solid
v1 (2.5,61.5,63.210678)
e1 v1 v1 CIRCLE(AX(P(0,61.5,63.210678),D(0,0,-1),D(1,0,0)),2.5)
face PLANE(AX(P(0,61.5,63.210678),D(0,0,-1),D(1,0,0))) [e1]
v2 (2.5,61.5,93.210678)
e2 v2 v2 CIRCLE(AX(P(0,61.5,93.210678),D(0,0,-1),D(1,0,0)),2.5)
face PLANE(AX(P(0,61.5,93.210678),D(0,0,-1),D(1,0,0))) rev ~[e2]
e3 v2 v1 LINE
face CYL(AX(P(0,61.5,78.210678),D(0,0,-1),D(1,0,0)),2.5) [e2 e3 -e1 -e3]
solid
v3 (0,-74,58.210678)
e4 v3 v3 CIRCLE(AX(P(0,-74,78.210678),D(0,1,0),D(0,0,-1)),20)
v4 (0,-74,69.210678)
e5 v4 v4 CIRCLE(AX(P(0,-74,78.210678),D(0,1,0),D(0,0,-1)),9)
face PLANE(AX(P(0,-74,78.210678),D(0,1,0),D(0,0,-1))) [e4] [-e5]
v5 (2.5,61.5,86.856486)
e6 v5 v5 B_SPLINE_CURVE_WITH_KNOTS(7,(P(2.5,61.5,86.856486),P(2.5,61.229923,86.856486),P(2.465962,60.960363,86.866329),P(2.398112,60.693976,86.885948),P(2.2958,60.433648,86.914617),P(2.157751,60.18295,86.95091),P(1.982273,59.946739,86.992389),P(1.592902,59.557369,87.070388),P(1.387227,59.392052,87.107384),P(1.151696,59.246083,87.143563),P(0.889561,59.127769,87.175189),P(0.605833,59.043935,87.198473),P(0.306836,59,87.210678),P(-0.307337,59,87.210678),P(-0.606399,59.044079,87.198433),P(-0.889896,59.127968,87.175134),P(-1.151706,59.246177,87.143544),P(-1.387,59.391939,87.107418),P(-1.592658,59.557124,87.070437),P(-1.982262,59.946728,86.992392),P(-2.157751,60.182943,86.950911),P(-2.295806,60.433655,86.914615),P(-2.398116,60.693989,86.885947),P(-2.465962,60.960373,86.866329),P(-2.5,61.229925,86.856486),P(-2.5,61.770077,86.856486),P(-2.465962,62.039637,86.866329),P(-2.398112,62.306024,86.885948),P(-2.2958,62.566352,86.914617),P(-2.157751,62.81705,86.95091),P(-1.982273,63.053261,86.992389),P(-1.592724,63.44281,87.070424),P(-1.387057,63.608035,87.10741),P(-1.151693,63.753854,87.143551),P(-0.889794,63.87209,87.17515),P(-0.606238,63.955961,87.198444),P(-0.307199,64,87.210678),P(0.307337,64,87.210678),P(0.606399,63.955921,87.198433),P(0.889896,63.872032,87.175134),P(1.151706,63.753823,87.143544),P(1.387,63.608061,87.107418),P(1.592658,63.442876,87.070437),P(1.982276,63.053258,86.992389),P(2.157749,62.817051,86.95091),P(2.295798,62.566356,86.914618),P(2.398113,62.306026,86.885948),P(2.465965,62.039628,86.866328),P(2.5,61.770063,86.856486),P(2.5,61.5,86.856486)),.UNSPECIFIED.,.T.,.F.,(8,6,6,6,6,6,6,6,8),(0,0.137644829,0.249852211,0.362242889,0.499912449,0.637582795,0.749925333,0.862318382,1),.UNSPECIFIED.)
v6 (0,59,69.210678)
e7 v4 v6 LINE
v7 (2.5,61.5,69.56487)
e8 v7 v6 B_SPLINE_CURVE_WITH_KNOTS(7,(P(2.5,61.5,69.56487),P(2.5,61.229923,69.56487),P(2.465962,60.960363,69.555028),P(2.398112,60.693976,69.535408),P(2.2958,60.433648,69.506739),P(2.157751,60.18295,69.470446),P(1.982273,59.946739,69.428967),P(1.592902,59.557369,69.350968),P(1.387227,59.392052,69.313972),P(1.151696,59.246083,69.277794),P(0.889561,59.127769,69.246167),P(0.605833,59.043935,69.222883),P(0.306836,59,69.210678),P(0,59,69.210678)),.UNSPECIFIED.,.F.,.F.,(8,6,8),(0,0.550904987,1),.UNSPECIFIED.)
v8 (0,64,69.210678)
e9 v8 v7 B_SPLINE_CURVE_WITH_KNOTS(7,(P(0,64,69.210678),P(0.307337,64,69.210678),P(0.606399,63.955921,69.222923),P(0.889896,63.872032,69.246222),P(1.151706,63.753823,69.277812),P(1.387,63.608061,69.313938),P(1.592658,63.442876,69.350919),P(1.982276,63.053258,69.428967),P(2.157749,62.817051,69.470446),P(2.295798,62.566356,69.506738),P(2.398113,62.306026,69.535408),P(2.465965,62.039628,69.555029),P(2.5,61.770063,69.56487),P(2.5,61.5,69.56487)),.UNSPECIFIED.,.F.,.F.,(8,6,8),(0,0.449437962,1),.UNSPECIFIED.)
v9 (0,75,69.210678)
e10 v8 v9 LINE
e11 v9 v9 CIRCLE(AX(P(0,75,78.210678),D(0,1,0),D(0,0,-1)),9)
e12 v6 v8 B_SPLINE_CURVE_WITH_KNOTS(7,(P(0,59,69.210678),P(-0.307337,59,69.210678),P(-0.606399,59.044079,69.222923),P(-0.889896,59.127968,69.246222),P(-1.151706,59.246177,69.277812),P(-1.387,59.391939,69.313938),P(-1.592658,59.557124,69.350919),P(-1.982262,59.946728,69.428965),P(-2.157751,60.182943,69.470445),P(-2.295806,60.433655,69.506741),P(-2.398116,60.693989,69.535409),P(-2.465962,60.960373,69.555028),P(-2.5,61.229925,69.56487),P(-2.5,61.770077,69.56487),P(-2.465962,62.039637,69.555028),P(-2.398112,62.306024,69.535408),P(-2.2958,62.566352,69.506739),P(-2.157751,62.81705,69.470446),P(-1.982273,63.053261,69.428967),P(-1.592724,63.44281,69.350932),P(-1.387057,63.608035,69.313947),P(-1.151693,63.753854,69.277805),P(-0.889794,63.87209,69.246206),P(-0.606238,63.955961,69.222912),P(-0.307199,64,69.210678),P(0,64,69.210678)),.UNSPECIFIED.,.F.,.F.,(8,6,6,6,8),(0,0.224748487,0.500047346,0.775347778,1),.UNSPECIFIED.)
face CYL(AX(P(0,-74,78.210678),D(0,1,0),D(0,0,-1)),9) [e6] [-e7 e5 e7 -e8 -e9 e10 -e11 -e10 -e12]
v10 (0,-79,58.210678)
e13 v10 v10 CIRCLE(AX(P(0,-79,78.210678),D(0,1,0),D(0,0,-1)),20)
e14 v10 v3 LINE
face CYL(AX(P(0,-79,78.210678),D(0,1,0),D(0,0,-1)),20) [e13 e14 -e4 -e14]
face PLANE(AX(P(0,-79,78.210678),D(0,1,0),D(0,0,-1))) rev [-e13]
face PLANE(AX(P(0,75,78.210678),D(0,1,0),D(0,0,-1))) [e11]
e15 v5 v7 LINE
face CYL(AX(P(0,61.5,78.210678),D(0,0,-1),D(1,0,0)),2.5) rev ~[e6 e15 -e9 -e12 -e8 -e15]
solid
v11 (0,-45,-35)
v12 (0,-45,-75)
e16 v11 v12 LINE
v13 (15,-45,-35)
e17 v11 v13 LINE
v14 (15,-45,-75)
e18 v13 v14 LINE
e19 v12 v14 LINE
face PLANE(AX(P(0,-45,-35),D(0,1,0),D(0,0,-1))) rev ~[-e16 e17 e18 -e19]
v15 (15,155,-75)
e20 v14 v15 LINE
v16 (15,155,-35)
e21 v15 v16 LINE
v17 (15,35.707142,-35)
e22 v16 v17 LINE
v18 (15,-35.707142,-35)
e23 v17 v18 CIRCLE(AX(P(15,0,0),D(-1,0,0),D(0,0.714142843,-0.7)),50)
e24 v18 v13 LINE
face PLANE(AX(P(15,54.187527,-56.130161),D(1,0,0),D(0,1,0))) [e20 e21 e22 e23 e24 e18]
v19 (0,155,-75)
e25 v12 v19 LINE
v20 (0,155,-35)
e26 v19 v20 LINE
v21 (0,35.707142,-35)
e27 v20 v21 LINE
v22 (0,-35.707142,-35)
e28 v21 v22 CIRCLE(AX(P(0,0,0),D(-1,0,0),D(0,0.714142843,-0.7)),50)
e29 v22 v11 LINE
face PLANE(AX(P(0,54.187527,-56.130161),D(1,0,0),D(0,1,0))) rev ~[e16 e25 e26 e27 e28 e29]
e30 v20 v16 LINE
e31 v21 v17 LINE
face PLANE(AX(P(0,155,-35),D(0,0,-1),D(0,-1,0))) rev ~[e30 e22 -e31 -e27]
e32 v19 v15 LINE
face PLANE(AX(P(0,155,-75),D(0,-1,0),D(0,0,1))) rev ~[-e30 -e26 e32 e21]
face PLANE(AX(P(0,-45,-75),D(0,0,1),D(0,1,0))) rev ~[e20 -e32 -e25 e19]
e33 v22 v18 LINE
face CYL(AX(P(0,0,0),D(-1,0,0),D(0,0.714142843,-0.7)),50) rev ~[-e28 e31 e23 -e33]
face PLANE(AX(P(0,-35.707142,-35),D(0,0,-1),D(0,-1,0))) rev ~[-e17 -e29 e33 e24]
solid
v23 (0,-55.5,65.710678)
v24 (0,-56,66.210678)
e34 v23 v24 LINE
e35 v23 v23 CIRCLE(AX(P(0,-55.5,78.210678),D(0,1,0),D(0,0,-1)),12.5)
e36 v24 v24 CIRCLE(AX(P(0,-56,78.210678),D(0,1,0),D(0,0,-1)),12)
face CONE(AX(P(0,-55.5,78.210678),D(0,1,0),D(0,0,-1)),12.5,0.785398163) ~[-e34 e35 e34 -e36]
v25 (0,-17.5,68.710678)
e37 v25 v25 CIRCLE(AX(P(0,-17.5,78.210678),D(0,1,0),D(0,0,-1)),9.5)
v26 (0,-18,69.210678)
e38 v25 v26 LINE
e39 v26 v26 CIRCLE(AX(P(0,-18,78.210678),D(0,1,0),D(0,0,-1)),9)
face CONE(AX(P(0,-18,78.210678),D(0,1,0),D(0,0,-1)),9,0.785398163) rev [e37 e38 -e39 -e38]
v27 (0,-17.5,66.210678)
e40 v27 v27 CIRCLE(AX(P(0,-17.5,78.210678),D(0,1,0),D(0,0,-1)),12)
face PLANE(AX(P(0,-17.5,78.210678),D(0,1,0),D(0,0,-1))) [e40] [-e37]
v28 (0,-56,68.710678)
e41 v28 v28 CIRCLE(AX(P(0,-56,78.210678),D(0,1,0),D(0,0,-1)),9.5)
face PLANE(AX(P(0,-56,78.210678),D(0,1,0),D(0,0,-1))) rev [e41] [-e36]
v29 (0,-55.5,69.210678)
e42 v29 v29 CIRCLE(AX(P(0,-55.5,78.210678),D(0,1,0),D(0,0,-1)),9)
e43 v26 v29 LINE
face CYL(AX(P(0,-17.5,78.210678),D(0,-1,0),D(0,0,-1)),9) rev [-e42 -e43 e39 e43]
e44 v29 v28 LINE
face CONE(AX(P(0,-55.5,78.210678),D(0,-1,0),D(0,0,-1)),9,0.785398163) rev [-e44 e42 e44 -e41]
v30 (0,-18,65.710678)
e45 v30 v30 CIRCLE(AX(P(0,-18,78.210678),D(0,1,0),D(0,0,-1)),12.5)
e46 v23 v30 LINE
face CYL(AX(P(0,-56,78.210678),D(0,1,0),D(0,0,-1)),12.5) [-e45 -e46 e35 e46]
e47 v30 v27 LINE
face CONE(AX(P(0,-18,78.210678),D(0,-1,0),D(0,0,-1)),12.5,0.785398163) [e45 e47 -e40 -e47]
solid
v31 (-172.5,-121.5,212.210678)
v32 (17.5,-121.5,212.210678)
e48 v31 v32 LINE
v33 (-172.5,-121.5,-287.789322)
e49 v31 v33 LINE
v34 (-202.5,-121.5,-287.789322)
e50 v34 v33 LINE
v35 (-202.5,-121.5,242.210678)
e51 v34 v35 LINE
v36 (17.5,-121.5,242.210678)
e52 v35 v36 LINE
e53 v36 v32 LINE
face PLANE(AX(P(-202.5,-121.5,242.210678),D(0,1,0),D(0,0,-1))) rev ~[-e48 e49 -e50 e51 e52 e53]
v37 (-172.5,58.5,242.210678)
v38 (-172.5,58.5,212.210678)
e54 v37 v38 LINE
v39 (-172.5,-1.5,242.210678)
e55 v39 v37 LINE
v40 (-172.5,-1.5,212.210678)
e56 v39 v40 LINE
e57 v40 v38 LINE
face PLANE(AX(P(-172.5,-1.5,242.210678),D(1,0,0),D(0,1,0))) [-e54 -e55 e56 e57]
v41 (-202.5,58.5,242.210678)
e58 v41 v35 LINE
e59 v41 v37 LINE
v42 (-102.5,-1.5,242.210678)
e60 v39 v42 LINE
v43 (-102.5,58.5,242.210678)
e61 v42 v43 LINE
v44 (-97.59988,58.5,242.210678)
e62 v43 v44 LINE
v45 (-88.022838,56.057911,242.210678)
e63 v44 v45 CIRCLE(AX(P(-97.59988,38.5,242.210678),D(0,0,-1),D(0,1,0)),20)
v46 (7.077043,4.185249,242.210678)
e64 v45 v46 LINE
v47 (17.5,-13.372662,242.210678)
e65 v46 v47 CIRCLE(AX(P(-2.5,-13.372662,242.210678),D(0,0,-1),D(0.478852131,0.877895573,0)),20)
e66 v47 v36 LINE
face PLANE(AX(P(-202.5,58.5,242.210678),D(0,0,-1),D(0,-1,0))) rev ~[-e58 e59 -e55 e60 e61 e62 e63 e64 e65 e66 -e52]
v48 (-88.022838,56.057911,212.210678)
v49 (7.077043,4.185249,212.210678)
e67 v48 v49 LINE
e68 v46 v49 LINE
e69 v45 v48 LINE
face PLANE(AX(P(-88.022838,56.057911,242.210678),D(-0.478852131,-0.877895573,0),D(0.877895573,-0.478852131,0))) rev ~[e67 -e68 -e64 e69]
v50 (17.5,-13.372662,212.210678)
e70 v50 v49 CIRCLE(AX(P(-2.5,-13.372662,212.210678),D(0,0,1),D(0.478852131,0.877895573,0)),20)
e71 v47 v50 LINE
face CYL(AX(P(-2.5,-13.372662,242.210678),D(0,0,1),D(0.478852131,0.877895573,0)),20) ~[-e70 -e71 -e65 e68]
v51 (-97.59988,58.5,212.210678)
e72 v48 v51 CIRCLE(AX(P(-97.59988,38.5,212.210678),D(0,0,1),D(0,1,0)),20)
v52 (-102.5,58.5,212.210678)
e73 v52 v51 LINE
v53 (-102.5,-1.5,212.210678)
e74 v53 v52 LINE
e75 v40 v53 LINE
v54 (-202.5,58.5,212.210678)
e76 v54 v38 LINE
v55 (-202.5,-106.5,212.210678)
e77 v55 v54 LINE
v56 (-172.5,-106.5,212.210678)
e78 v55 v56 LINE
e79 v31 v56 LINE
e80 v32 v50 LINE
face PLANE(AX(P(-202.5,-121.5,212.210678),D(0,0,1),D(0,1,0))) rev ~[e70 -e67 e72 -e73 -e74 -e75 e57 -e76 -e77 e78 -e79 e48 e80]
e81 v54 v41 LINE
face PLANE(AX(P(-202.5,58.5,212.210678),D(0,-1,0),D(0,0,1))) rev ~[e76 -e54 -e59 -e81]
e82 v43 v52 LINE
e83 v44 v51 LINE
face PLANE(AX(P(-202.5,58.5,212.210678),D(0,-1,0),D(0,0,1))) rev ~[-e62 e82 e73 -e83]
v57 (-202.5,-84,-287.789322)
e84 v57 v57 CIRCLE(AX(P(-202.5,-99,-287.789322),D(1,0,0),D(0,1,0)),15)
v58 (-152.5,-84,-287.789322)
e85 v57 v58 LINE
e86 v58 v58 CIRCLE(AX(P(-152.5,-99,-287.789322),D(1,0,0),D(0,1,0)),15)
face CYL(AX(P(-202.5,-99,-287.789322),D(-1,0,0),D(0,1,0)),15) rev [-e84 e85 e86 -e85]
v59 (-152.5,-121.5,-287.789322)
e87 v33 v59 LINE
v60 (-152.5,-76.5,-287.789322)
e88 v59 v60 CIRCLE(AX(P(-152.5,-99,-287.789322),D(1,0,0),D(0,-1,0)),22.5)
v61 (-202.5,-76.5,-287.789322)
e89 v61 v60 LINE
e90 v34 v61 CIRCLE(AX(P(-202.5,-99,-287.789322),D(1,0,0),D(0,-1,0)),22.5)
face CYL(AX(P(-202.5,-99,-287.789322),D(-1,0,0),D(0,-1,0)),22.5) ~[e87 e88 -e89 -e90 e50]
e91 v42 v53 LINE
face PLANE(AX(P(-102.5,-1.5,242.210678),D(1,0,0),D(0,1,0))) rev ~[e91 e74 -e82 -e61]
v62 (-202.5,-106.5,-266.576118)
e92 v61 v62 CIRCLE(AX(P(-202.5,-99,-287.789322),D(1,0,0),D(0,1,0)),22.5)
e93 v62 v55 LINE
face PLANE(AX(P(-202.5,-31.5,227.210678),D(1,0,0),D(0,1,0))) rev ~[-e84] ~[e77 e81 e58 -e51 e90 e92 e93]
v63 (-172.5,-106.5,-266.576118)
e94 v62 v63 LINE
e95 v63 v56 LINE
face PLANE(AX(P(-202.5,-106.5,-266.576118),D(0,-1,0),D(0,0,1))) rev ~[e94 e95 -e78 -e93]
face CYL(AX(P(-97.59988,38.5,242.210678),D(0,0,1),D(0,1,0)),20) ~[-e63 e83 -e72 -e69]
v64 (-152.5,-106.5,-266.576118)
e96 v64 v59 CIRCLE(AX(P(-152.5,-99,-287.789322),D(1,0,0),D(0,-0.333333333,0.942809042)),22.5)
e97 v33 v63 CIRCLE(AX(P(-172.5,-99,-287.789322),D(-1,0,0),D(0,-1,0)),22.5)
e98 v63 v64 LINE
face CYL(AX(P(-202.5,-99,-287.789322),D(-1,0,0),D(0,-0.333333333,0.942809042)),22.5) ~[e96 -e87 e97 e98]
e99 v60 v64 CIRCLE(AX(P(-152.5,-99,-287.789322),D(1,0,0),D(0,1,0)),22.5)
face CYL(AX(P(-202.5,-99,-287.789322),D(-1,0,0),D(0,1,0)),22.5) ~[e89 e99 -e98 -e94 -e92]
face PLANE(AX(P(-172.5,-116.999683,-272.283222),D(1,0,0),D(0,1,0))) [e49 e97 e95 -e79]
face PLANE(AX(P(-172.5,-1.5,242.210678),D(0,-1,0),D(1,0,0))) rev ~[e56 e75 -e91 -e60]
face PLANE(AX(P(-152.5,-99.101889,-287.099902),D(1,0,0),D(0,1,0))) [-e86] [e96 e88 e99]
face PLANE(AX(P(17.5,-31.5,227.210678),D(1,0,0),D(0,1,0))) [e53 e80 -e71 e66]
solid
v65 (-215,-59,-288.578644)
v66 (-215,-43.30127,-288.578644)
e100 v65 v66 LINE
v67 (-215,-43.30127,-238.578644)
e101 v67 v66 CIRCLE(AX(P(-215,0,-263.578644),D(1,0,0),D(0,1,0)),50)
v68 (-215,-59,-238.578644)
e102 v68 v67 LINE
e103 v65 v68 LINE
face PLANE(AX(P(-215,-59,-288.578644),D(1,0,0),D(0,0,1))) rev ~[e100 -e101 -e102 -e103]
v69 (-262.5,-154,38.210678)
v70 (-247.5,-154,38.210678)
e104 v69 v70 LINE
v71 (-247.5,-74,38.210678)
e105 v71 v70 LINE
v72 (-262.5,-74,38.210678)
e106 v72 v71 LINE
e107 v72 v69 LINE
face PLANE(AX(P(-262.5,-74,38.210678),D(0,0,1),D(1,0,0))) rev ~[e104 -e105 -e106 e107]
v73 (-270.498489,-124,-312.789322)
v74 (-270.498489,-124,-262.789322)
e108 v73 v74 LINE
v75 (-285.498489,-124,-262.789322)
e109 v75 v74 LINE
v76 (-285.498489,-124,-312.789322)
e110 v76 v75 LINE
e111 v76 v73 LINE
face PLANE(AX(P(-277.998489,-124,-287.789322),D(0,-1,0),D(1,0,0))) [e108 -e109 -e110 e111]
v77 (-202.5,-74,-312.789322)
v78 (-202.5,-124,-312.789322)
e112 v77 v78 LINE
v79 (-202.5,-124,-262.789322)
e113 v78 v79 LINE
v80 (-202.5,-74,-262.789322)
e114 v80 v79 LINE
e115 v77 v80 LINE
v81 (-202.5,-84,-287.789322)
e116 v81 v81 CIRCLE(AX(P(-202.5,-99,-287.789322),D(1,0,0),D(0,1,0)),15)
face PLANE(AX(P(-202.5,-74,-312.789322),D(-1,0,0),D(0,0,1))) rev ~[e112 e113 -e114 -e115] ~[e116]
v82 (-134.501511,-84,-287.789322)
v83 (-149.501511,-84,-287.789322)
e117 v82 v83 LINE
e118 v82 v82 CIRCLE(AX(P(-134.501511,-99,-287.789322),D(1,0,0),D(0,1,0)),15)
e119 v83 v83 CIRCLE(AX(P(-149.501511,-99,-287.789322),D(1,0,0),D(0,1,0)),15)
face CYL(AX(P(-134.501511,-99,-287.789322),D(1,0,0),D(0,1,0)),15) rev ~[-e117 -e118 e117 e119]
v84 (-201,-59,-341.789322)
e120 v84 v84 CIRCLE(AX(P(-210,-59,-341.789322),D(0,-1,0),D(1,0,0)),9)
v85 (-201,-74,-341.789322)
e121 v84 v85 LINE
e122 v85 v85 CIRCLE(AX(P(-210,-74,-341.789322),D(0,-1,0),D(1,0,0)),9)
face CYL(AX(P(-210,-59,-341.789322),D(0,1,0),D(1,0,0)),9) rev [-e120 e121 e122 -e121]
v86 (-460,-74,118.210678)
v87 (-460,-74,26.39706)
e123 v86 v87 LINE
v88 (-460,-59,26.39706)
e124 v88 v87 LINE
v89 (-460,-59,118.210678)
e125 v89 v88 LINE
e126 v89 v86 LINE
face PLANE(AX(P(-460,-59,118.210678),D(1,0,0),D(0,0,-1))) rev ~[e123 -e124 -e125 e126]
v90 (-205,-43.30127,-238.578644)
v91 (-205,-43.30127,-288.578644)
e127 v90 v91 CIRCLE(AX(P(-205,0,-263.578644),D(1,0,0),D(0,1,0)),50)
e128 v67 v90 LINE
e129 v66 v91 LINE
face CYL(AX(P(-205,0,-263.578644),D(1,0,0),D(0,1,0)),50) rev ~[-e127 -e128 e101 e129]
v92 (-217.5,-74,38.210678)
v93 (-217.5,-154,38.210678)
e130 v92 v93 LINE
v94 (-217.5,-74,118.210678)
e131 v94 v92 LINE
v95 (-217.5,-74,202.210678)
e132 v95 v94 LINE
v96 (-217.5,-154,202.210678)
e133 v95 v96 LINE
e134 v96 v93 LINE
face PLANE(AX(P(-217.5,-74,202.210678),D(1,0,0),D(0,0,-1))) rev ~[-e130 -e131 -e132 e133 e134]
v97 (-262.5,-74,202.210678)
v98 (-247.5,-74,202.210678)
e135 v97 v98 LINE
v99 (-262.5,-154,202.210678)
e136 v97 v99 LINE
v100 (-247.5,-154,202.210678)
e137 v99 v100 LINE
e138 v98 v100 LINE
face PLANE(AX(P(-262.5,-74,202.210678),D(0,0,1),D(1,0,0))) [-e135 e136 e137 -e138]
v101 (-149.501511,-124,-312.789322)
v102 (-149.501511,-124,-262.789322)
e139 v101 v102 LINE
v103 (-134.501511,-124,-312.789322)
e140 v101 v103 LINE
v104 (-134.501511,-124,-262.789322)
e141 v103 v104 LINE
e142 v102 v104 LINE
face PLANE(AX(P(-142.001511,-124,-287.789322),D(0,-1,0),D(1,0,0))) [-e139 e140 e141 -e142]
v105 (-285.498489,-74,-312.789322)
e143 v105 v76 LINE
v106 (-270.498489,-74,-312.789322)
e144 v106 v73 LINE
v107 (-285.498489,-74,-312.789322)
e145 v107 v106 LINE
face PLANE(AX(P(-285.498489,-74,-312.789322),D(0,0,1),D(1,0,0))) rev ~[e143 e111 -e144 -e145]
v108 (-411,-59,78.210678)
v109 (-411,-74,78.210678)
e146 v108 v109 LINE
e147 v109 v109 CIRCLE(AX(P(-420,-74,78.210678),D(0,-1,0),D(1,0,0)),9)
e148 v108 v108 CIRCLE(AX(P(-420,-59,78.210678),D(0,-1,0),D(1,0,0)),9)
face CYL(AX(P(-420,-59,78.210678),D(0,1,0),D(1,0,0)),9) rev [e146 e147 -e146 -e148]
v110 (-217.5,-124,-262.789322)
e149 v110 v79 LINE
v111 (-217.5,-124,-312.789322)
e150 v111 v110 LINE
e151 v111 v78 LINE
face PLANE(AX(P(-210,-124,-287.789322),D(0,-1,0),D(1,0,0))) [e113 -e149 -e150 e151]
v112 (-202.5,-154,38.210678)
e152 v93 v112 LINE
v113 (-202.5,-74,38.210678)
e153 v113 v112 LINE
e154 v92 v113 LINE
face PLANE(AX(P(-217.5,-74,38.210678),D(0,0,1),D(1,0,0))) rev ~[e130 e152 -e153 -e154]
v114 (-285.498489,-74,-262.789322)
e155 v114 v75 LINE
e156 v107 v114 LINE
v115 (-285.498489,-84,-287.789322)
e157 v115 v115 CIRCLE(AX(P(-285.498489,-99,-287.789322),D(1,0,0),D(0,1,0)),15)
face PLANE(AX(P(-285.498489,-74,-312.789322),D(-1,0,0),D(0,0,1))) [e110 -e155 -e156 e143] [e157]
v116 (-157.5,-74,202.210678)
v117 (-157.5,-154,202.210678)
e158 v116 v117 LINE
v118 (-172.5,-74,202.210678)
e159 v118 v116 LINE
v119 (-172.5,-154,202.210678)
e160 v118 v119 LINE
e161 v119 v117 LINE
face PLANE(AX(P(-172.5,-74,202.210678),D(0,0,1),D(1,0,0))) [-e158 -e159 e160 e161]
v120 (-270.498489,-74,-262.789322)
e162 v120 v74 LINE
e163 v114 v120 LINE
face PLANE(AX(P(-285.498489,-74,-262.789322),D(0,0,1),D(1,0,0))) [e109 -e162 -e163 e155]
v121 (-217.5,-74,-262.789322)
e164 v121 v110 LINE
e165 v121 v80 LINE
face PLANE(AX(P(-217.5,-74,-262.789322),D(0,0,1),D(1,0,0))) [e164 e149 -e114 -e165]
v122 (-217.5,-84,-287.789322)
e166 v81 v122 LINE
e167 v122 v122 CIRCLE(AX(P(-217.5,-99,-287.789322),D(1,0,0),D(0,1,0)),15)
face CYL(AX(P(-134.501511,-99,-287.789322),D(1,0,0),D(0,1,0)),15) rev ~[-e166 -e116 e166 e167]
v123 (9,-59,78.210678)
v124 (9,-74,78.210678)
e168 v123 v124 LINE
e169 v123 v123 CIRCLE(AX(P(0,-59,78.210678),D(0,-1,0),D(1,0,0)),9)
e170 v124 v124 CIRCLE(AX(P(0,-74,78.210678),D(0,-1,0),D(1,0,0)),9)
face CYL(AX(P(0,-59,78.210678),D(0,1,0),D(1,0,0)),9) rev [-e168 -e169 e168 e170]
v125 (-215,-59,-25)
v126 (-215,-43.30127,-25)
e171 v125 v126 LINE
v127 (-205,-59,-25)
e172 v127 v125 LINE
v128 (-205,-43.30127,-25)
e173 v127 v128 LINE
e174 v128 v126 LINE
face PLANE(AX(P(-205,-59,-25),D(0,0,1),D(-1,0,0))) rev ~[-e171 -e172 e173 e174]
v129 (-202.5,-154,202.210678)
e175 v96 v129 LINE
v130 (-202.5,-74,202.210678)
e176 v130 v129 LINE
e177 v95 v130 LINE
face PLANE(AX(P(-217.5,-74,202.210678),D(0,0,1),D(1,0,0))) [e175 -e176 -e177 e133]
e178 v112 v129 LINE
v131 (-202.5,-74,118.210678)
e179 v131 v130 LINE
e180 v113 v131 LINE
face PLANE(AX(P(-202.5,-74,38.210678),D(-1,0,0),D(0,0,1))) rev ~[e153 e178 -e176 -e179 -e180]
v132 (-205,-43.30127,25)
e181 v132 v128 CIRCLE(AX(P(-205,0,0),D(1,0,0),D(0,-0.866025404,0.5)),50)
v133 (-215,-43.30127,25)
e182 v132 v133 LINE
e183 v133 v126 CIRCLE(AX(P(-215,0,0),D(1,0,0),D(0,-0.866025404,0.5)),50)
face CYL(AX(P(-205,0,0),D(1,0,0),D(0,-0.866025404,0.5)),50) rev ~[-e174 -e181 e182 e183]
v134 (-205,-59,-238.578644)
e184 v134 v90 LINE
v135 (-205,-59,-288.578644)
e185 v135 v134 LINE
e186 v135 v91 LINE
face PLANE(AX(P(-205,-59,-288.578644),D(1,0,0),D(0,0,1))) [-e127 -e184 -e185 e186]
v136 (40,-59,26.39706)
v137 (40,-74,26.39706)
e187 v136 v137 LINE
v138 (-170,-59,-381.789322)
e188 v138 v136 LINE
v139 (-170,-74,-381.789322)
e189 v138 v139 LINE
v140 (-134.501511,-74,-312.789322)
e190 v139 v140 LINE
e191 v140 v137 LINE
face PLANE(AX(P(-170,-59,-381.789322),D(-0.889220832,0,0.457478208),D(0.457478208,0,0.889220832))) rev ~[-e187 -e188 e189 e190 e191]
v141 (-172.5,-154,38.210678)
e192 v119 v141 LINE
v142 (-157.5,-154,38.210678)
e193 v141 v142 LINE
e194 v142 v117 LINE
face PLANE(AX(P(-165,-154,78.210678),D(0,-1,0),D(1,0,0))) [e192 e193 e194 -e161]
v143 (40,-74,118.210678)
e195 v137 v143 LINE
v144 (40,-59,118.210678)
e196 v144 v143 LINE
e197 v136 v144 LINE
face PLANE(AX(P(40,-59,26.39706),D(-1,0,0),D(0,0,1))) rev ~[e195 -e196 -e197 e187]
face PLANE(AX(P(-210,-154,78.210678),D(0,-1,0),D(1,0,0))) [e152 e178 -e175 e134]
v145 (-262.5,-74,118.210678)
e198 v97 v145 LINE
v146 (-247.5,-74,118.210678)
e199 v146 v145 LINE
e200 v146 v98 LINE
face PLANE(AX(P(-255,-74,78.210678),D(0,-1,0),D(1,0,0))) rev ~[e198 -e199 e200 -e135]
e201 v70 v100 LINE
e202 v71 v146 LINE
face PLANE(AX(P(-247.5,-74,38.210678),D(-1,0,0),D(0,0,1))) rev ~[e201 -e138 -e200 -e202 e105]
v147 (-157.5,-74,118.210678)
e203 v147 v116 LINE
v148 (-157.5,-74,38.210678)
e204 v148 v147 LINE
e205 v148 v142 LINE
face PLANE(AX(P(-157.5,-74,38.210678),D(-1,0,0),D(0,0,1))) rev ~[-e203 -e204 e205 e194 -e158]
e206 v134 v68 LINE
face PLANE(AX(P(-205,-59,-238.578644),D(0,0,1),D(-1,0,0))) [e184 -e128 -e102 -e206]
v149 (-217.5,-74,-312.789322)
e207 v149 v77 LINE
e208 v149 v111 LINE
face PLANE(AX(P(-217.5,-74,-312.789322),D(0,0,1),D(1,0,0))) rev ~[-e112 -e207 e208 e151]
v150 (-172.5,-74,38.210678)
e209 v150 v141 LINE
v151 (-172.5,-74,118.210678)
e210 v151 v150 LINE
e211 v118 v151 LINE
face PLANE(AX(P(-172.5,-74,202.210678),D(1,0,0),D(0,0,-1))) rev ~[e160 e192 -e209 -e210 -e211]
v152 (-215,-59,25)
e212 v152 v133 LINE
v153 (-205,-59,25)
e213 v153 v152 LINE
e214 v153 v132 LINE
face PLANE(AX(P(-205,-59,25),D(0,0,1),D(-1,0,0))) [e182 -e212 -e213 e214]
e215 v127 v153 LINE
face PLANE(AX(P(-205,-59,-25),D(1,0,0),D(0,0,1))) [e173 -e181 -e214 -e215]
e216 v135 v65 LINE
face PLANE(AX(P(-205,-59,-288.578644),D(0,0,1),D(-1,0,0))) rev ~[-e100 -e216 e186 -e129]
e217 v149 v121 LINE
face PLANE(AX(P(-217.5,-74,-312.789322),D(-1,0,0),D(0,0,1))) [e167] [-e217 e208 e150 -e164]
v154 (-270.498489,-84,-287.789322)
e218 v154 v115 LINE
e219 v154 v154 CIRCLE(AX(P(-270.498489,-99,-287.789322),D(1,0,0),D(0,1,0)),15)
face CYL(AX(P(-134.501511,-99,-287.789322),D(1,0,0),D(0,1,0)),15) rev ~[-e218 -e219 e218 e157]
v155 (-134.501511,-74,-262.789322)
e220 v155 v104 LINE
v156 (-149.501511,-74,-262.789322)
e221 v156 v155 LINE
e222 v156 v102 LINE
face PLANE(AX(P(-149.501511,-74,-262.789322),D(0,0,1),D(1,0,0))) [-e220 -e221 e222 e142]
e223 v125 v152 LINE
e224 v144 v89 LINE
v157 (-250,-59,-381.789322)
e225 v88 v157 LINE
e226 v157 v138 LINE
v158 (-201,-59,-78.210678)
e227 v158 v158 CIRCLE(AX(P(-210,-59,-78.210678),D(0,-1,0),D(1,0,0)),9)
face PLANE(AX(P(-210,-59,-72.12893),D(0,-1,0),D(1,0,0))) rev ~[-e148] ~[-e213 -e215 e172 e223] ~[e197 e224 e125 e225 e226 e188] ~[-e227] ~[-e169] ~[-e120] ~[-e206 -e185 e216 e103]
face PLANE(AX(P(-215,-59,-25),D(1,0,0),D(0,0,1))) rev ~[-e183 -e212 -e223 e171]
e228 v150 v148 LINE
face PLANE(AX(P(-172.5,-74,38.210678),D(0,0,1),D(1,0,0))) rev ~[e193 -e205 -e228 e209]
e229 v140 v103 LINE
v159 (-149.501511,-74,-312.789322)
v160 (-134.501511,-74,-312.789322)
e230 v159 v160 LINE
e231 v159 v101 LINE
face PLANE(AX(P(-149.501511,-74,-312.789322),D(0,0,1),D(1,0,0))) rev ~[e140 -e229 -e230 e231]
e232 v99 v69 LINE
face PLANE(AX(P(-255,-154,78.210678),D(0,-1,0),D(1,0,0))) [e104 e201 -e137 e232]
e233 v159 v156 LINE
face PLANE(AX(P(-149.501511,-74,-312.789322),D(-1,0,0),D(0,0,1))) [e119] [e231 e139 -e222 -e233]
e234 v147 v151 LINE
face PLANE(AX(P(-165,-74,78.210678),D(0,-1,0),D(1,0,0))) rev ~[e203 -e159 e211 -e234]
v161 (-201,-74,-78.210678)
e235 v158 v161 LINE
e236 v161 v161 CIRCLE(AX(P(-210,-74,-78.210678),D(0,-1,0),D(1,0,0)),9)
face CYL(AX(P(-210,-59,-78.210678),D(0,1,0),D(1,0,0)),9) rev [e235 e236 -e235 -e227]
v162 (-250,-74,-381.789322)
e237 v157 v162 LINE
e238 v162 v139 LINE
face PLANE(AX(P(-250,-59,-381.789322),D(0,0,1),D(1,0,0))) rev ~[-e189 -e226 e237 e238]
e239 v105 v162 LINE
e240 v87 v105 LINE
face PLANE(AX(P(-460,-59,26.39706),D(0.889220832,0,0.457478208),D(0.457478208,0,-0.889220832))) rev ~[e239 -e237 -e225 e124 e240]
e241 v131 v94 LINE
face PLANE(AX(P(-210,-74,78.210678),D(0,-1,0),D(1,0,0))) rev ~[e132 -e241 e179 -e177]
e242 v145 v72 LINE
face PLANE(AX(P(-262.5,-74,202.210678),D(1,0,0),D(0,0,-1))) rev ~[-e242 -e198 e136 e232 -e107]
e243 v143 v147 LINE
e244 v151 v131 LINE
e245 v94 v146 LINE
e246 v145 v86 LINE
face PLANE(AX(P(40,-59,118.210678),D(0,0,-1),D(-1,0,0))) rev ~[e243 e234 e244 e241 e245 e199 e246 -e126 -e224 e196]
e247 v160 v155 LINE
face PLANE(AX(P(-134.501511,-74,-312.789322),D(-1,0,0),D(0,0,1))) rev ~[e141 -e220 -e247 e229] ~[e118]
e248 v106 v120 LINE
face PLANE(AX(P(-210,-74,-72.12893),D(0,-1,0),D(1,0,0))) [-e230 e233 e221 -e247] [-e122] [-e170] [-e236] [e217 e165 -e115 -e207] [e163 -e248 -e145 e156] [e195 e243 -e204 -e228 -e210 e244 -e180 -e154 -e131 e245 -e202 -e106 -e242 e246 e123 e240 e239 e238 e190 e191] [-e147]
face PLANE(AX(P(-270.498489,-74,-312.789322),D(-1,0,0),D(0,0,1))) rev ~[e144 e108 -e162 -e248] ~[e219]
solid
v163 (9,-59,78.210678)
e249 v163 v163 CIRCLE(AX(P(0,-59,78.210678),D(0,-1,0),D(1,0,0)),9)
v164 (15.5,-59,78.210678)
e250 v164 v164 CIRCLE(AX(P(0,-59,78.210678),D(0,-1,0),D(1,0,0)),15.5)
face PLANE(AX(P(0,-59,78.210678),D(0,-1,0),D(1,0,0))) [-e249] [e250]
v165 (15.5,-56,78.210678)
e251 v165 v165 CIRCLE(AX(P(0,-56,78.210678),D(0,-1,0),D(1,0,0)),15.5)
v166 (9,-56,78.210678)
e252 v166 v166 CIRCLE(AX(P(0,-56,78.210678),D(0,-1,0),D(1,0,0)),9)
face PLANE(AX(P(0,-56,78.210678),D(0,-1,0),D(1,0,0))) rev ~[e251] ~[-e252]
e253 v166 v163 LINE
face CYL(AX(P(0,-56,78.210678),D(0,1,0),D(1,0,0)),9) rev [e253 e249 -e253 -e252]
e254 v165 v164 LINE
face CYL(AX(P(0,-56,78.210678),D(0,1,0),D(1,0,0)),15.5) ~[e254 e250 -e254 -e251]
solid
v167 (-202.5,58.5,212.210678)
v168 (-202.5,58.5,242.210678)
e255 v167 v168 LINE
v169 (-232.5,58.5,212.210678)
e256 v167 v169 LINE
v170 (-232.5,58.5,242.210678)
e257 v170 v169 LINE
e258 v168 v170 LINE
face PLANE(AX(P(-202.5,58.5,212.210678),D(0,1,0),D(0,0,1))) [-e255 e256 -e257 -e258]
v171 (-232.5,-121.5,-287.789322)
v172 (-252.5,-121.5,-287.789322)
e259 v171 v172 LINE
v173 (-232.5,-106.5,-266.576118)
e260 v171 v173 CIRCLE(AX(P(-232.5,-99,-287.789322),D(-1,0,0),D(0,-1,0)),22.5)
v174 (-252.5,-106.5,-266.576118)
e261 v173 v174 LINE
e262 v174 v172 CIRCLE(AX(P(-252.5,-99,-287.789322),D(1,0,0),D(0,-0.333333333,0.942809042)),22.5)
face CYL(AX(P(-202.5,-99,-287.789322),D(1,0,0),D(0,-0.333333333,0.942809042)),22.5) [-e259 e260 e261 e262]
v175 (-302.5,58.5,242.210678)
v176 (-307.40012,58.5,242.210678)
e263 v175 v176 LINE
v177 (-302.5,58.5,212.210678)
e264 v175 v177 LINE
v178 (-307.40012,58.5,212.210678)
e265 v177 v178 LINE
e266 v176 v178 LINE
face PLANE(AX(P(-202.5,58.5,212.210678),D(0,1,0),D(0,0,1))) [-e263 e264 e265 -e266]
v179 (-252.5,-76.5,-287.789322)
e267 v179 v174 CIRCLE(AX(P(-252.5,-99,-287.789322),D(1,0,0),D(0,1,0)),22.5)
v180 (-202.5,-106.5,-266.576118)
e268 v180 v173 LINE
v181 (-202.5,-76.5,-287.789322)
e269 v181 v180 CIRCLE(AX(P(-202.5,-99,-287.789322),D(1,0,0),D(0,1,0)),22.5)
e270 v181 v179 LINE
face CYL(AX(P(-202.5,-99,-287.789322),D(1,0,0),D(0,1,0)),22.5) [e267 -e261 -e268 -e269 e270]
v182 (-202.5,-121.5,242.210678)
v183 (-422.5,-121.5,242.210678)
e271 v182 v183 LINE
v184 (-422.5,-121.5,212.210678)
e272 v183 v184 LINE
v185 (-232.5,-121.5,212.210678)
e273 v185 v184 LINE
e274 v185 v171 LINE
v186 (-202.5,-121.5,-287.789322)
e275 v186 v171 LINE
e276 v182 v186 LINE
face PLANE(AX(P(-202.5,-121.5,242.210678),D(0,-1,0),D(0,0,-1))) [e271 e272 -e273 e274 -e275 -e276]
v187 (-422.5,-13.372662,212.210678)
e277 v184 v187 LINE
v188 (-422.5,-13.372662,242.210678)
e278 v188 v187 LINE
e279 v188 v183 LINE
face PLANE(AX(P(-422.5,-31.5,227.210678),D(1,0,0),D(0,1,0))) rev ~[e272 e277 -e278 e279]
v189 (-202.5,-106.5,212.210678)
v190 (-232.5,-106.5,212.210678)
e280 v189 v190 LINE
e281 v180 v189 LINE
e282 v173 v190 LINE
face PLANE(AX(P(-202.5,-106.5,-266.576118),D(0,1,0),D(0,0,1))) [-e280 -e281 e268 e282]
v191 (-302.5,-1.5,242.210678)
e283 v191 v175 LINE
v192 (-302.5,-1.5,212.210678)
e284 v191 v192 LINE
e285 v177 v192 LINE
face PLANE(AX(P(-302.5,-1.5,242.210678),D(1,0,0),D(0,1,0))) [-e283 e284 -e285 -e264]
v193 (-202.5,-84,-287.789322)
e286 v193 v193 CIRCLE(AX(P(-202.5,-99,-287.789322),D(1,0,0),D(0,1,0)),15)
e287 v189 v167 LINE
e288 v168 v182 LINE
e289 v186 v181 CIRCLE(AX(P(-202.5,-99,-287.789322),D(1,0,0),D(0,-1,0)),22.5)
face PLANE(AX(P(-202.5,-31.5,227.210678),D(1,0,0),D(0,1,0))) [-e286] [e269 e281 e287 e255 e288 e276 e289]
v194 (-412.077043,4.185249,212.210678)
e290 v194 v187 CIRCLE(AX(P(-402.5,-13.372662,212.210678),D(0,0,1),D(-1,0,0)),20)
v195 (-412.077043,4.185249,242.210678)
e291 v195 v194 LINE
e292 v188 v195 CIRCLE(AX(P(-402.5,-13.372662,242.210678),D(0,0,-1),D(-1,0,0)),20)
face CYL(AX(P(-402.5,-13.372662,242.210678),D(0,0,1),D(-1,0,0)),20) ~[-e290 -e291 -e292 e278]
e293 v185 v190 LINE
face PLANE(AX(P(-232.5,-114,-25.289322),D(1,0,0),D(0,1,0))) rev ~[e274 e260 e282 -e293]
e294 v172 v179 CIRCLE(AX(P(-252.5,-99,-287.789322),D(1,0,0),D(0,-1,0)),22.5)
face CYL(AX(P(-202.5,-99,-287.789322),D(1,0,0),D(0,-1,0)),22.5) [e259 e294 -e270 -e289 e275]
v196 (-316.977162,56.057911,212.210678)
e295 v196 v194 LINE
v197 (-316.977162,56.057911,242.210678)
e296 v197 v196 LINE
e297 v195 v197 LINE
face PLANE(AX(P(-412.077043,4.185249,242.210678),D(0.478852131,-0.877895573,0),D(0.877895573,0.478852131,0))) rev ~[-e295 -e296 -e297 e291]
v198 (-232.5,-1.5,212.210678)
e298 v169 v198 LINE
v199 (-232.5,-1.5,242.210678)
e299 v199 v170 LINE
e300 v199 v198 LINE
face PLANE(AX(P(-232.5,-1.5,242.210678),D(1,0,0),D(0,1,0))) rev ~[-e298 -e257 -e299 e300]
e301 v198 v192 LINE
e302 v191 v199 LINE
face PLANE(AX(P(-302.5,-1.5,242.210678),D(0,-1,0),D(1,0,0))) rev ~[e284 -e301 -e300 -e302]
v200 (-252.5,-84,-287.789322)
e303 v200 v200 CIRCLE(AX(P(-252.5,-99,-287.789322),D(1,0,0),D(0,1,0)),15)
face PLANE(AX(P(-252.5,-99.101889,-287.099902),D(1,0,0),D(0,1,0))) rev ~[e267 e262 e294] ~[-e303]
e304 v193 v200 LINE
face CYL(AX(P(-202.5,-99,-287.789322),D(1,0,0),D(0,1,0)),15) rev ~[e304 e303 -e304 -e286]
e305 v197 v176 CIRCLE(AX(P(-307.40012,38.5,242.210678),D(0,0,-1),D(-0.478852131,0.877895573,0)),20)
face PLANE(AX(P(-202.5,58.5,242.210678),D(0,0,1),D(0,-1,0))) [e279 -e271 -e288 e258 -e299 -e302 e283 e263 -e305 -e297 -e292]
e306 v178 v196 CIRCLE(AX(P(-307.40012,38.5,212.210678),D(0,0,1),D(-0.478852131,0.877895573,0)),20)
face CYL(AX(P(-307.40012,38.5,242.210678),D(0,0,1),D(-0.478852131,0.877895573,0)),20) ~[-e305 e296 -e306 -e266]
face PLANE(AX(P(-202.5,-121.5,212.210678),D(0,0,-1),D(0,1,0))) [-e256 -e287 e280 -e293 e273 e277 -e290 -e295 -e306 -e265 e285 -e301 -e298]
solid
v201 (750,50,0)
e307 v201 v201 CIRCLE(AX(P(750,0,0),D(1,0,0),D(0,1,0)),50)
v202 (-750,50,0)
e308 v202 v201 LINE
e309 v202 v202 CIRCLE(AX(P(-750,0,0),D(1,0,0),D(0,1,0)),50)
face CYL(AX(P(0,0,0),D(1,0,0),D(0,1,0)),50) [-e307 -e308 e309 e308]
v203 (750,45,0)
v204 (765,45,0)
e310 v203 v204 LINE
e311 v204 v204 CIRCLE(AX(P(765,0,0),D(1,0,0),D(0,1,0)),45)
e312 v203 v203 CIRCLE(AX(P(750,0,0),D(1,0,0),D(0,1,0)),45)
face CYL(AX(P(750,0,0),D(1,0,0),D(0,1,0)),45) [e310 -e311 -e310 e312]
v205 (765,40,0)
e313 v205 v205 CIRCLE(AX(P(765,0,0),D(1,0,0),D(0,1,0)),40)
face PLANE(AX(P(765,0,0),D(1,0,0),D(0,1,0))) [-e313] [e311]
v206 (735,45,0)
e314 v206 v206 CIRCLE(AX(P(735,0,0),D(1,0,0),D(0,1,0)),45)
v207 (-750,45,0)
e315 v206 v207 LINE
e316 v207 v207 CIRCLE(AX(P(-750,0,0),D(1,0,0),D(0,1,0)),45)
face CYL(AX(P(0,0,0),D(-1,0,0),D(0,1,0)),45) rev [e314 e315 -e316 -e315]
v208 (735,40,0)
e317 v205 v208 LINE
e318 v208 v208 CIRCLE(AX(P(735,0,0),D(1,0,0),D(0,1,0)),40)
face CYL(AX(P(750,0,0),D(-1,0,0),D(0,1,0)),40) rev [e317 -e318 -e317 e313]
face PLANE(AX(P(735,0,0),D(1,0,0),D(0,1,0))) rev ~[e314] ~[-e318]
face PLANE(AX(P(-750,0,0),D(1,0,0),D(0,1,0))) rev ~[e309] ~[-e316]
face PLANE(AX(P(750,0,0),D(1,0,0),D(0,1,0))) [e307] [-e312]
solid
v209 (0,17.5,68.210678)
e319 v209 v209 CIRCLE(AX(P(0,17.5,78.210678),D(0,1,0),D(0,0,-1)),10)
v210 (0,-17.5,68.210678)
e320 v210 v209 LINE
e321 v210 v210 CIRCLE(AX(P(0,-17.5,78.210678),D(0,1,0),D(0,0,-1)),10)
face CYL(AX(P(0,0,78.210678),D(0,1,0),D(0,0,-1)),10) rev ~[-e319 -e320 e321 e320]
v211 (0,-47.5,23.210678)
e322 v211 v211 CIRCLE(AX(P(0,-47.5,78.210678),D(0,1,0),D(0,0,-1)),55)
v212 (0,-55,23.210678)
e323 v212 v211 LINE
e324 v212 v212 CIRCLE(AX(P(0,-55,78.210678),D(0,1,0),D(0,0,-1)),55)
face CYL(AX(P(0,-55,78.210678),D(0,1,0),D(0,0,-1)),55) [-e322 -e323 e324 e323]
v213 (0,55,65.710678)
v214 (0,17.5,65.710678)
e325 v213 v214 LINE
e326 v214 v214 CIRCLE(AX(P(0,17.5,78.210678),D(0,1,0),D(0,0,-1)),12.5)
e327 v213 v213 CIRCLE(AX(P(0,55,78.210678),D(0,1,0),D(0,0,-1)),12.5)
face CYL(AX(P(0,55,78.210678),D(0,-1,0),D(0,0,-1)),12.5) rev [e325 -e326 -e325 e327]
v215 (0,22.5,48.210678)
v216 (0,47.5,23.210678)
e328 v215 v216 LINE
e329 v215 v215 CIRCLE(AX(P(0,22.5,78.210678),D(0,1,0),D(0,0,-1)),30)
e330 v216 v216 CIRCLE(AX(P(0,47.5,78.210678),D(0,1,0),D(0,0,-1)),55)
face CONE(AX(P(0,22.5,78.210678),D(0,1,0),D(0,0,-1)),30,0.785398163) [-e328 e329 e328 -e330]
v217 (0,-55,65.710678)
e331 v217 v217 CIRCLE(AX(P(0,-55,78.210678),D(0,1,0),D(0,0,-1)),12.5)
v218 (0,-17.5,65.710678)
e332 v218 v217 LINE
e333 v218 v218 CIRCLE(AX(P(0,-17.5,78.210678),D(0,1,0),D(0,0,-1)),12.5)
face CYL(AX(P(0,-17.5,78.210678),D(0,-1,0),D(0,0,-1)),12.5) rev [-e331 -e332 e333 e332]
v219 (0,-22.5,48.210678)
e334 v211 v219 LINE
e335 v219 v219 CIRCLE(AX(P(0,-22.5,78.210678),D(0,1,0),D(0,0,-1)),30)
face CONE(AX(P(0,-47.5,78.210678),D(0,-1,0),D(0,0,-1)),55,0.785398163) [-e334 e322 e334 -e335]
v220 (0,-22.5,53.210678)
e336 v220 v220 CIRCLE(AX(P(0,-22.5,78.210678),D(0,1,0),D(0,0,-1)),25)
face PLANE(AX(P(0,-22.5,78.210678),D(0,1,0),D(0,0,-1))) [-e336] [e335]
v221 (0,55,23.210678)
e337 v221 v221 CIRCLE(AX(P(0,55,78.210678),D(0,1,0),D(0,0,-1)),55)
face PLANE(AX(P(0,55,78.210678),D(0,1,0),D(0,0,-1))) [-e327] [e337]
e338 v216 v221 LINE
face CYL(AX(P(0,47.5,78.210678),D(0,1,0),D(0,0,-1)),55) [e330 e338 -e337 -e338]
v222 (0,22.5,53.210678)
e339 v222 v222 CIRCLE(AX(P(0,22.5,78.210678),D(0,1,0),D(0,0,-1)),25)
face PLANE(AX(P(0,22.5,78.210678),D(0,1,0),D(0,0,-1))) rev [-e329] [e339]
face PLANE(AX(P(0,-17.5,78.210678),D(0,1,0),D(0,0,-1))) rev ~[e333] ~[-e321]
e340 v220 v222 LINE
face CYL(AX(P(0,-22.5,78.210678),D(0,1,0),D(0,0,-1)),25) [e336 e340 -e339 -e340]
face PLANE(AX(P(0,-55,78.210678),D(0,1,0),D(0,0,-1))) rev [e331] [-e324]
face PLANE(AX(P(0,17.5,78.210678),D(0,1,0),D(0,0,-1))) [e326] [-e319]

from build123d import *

# Parameters (mm, degrees)
F0_R      = 50
F0_R_2    = 45
F1_DEPTH  = 750
F2_W      = 35
F2_H      = 2.5
F6_SIZE   = 0.5
F8_DEPTH  = 15
F9_R      = 15.5
F9_R_2    = 12
F9_R_3    = 9.5
F9_R_4    = 9
F10_DEPTH = 3
F11_R     = 9
F11_R_2   = 15.5
F12_DEPTH = 15
F16_W     = 10
F16_H     = 50
F17_DEPTH = 50
F18_R     = 50
F19_DEPTH = 545.001
F21_R     = 2.5
F22_DEPTH = 12.5
F23_DEPTH = 15
F24_W     = 15
F24_H     = 50
F25_DEPTH = 50
F26_R     = 15
F27_DEPTH = 615.4994894868
F28_R     = 15
F29_DEPTH = 50
F28_W     = 15
F28_H     = 475
F30_DEPTH = 30
F31_DEPTH = 220
F32_W     = 70
F32_H     = 60
F33_DEPTH = 624.001
F34_DEPTH = 50
F35_DEPTH = 30
F36_DEPTH = 220
F37_DEPTH = 624.001
F38_R     = 45
F38_R_2   = 40
F39_DEPTH = 15
F40_W     = 15
F40_H     = 80
F40_H_2   = 84
F41_DEPTH = 80


with BuildPart() as f1:
    # F0 (on Right) → F1 (new body, symmetric)
    with BuildSketch(Plane.YZ):
        Circle(F0_R)
        Circle(F0_R_2, mode=Mode.SUBTRACT)
    extrude(amount=F1_DEPTH, both=True)

    # F38 (on face) → F39 (join, symmetric)
    with BuildSketch(Plane.YZ.offset(750)):
        Circle(F38_R)
        Circle(F38_R_2, mode=Mode.SUBTRACT)
    extrude(amount=F39_DEPTH, both=True)


with BuildPart() as f3:
    # F2 (on Right) → F3 (revolve)
    with BuildSketch(Plane.YZ):
        with Locations((0, 66.9606781187)):
            Rectangle(F2_W, F2_H)
        Polygon((-17.5, 65.7106781187), (-55, 65.7106781187), (-55, 23.2106781187), (-47.5, 23.2106781187), (-22.5, 48.2106781187), (-22.5, 53.2106781187), (22.5, 53.2106781187), (22.5, 48.2106781187), (47.5, 23.2106781187), (55, 23.2106781187), (55, 65.7106781187), (17.5, 65.7106781187), align=None)
    revolve(axis=Axis((0, 60.7904960771, 78.2106781187), (0, 1, 0)))


with BuildPart() as f5:
    # F4 (on face) → F5 (revolve)
    with BuildSketch(Plane.YZ):
        Polygon((-56, 65.7106781187), (-55, 65.7106781187), (-17.5, 65.7106781187), (-17.5, 68.2106781187), (-17.5, 69.2106781187), (-56, 69.2106781187), align=None)
    revolve(axis=Axis((0, 60.7904960771, 78.2106781187), (0, 1, 0)))

    # F6
    f6_edges = [f5.edges().sort_by_distance(p)[0] for p in [
        (0, -56, 87.210678),
        (0, -17.5, 87.210678),
        (0, -17.5, 90.710678),
        (0, -56, 90.710678),
    ]]
    chamfer(f6_edges, length=F6_SIZE)


with BuildPart() as f8:
    # F7 (on Right) → F8 (new body)
    with BuildSketch(Plane.YZ):
        with BuildLine():
            ThreePointArc((35.7071421427, -35), (0, -50), (-35.7071421427, -35))
            Line((-35.7071421427, -35), (-45, -35))
            Line((-45, -35), (-45, -75))
            Line((-45, -75), (155, -75))
            Line((155, -75), (155, -35))
            Line((155, -35), (35.7071421427, -35))
        make_face()
    extrude(amount=F8_DEPTH)


with BuildPart() as f10:
    # F9 (on face) → F10 (new body)
    with BuildSketch(Plane.XZ.offset(56)):
        with Locations((0, 78.2106781187)):
            Circle(F9_R)
        with Locations((0, 78.2106781187)):
            Circle(F9_R_2, mode=Mode.SUBTRACT)
        with Locations((0, 78.2106781187)):
            Circle(F9_R_2)
        with Locations((0, 78.2106781187)):
            Circle(F9_R_3, mode=Mode.SUBTRACT)
        with Locations((0, 78.2106781187)):
            Circle(F9_R_3)
        with Locations((0, 78.2106781187)):
            Circle(F9_R_4, mode=Mode.SUBTRACT)
    extrude(amount=F10_DEPTH)


with BuildPart() as f12:
    # F11 (on face) → F12 (new body)
    with BuildSketch(Plane.XZ.offset(59)):
        Polygon((40, 118.2106781187), (-460, 118.2106781187), (-460, 26.3970603982), (-250, -381.7893218813), (-170, -381.7893218813), (40, 26.3970603982), align=None)
        with Locations((-210, -341.7893218813)):
            Circle(F11_R, mode=Mode.SUBTRACT)
        with Locations((-420, 78.2106781187)):
            Circle(F11_R, mode=Mode.SUBTRACT)
        with Locations((-210, -78.2106781187)):
            Circle(F11_R, mode=Mode.SUBTRACT)
        with Locations((0, 78.2106781187)):
            Circle(F11_R_2, mode=Mode.SUBTRACT)
        with Locations((0, 78.2106781187)):
            Circle(F11_R_2)
        with Locations((0, 78.2106781187)):
            Circle(F11_R, mode=Mode.SUBTRACT)
    extrude(amount=F12_DEPTH)

    # F16 (on face) → F17 (join)
    with BuildSketch(Plane(origin=(0, -59, 0), x_dir=(-1, 0, 0), z_dir=(0, 1, 0))):
        with Locations((210, 0)):
            Rectangle(F16_W, F16_H)
        with Locations((210, -263.5786437627)):
            Rectangle(F16_W, F16_H)
    extrude(amount=F17_DEPTH)

    # F18 (on face) → F19 (cut, through all)
    with BuildSketch(Plane.YZ.offset(-205)):
        with Locations((0, -263.5786437627)):
            Circle(F18_R)
        with BuildLine():
            ThreePointArc((-43.3012701892, -25), (12.9409522551, -48.2962913145), (50, 0))
            ThreePointArc((50, 0), (12.9409522551, 48.2962913145), (-43.3012701892, 25))
            Line((-43.3012701892, 25), (-9, 25))
            Line((-9, 25), (-9, -25))
            Line((-9, -25), (-43.3012701892, -25))
        make_face()
        with BuildLine():
            Line((-9, 25), (-43.3012701892, 25))
            ThreePointArc((-43.3012701892, 25), (-50, 0), (-43.3012701892, -25))
            Line((-43.3012701892, -25), (-9, -25))
            Line((-9, -25), (-9, 25))
        make_face()
    extrude(amount=-F19_DEPTH, mode=Mode.SUBTRACT)

    # F24 (on face) → F25 (join)
    with BuildSketch(Plane.XZ.offset(74)):
        with Locations((-142.0015105132, -287.7893218813)):
            Rectangle(F24_W, F24_H)
        with Locations((-277.9984894868, -287.7893218813)):
            Rectangle(F24_W, F24_H)
        with Locations((-210, -287.7893218813)):
            Rectangle(F24_W, F24_H)
    extrude(amount=F25_DEPTH)

    # F26 (on face) → F27 (cut, through all)
    with BuildSketch(Plane.YZ.offset(-134.5015105132)):
        with Locations((-99, -287.7893218813)):
            Circle(F26_R)
    extrude(amount=-F27_DEPTH, mode=Mode.SUBTRACT)

    # F40 (on face) → F41 (join)
    with BuildSketch(Plane.XZ.offset(74)):
        with Locations((-255, 78.2106781187)):
            Rectangle(F40_W, F40_H)
        with Locations((-210, 78.2106781187)):
            Rectangle(F40_W, F40_H)
        with Locations((-165, 78.2106781187)):
            Rectangle(F40_W, F40_H)
        with Locations((-255, 160.2106781187)):
            Rectangle(F40_W, F40_H_2)
        with Locations((-210, 160.2106781187)):
            Rectangle(F40_W, F40_H_2)
        with Locations((-165, 160.2106781187)):
            Rectangle(F40_W, F40_H_2)
    extrude(amount=F41_DEPTH)


with BuildPart() as f15:
    # F14 (on Right) → F15 (revolve)
    with BuildSketch(Plane.YZ):
        Polygon((-74, 58.2106781187), (-74, 69.2106781187), (-74, 78.2106781187), (-79, 78.2106781187), (-79, 58.2106781187), align=None)
        Polygon((-74, 69.2106781187), (-56, 69.2106781187), (-17.5, 69.2106781187), (75, 69.2106781187), (75, 78.2106781187), (0, 78.2106781187), (-74, 78.2106781187), align=None)
    revolve(axis=Axis((0, 60.7904960771, 78.2106781187), (0, 1, 0)))

    # F21 (on face) → F22 (cut, symmetric)
    with BuildSketch(Plane(origin=(0, 0, 78.2106781187), x_dir=(1, 0, 0), z_dir=(0, 0, -1))):
        with Locations((0, -61.5)):
            Circle(F21_R)
    extrude(amount=F22_DEPTH, both=True, mode=Mode.SUBTRACT)


with BuildPart() as f23:
    # F21 (on face) → F23 (new body, symmetric)
    with BuildSketch(Plane(origin=(0, 0, 78.2106781187), x_dir=(1, 0, 0), z_dir=(0, 0, -1))):
        with Locations((0, -61.5)):
            Circle(F21_R)
    extrude(amount=F23_DEPTH, both=True)


with BuildPart() as f29:
    # F28 (on face) → F29 (new body)
    with BuildSketch(Plane.YZ.offset(-202.5)):
        with BuildLine():
            ThreePointArc((-121.5, -287.7893218813), (-99, -310.2893218813), (-76.5, -287.7893218813))
            ThreePointArc((-76.5, -287.7893218813), (-86.0096189432, -269.4181488105), (-106.5, -266.5761184457))
            ThreePointArc((-106.5, -266.5761184457), (-117.3711730709, -274.7989408246), (-121.5, -287.7893218813))
        make_face()
        with Locations((-99, -287.7893218813)):
            Circle(F28_R, mode=Mode.SUBTRACT)
    extrude(amount=F29_DEPTH)

    # F28 (on face) → F30 (join)
    with BuildSketch(Plane.YZ.offset(-202.5)):
        with BuildLine():
            ThreePointArc((-121.5, -287.7893218813), (-117.3711730709, -274.7989408246), (-106.5, -266.5761184457))
            Line((-106.5, -266.5761184457), (-106.5, -262.7893218813))
            Line((-106.5, -262.7893218813), (-121.5, -262.7893218813))
            Line((-121.5, -262.7893218813), (-121.5, -287.7893218813))
        make_face()
        with Locations((-114, -25.2893218813)):
            Rectangle(F28_W, F28_H)
    extrude(amount=F30_DEPTH)

    # F28 (on face) → F31 (join)
    with BuildSketch(Plane.YZ.offset(-202.5)):
        Polygon((-121.5, 212.2106781187), (-106.5, 212.2106781187), (58.5, 212.2106781187), (58.5, 242.2106781187), (-121.5, 242.2106781187), align=None)
    extrude(amount=F31_DEPTH)

    # F32 (on face) → F33 (cut, through all)
    with BuildSketch(Plane.XY.offset(242.2106781187)):
        with Locations((-137.5, 28.5)):
            Rectangle(F32_W, F32_H)
        Polygon((17.5, 58.5), (-92.5, 58.5), (-88.0228376735, 56.0579114583), (7.0770426136, 4.1852494835), (17.5, -1.5), align=None)
        with BuildLine():
            Line((-92.5, 58.5), (-97.5998802871, 58.5))
            ThreePointArc((-97.5998802871, 58.5), (-92.6581310607, 57.8798636368), (-88.0228376735, 56.0579114583))
            Line((-88.0228376735, 56.0579114583), (-92.5, 58.5))
        make_face()
        with BuildLine():
            ThreePointArc((7.0770426136, 4.1852494835), (14.697977385, -3.1633733677), (17.5, -13.3726619748))
            Line((17.5, -13.3726619748), (17.5, -1.5))
            Line((17.5, -1.5), (7.0770426136, 4.1852494835))
        make_face()
    extrude(amount=-F33_DEPTH, mode=Mode.SUBTRACT)


with BuildPart() as f34:
    # F28 (on face) → F34 (new body)
    with BuildSketch(Plane.YZ.offset(-202.5)):
        with BuildLine():
            ThreePointArc((-121.5, -287.7893218813), (-99, -310.2893218813), (-76.5, -287.7893218813))
            ThreePointArc((-76.5, -287.7893218813), (-86.0096189432, -269.4181488105), (-106.5, -266.5761184457))
            ThreePointArc((-106.5, -266.5761184457), (-117.3711730709, -274.7989408246), (-121.5, -287.7893218813))
        make_face()
        with Locations((-99, -287.7893218813)):
            Circle(F28_R, mode=Mode.SUBTRACT)
    extrude(amount=-F34_DEPTH)

    # F28 (on face) → F35 (join)
    with BuildSketch(Plane.YZ.offset(-202.5)):
        with Locations((-114, -25.2893218813)):
            Rectangle(F28_W, F28_H)
        with BuildLine():
            ThreePointArc((-121.5, -287.7893218813), (-117.3711730709, -274.7989408246), (-106.5, -266.5761184457))
            Line((-106.5, -266.5761184457), (-106.5, -262.7893218813))
            Line((-106.5, -262.7893218813), (-121.5, -262.7893218813))
            Line((-121.5, -262.7893218813), (-121.5, -287.7893218813))
        make_face()
    extrude(amount=-F35_DEPTH)

    # F28 (on face) → F36 (join)
    with BuildSketch(Plane.YZ.offset(-202.5)):
        Polygon((-121.5, 212.2106781187), (-106.5, 212.2106781187), (58.5, 212.2106781187), (58.5, 242.2106781187), (-121.5, 242.2106781187), align=None)
    extrude(amount=-F36_DEPTH)

    # F32 (on face) → F37 (cut, through all)
    with BuildSketch(Plane.XY.offset(242.2106781187)):
        Polygon((-316.9771623265, 56.0579114583), (-312.5, 58.5), (-422.5, 58.5), (-422.5, -1.5), (-412.0770426136, 4.1852494835), align=None)
        with Locations((-267.5, 28.5)):
            Rectangle(F32_W, F32_H)
        with BuildLine():
            ThreePointArc((-316.9771623265, 56.0579114583), (-312.3418689393, 57.8798636368), (-307.4001197129, 58.5))
            Line((-307.4001197129, 58.5), (-312.5, 58.5))
            Line((-312.5, 58.5), (-316.9771623265, 56.0579114583))
        make_face()
        with BuildLine():
            ThreePointArc((-422.5, -13.3726619748), (-419.697977385, -3.1633733677), (-412.0770426136, 4.1852494835))
            Line((-412.0770426136, 4.1852494835), (-422.5, -1.5))
            Line((-422.5, -1.5), (-422.5, -13.3726619748))
        make_face()
    extrude(amount=-F37_DEPTH, mode=Mode.SUBTRACT)


solid = Compound([f1.part, f3.part, f5.part, f8.part, f10.part, f12.part, f15.part, f23.part, f29.part, f34.part])
